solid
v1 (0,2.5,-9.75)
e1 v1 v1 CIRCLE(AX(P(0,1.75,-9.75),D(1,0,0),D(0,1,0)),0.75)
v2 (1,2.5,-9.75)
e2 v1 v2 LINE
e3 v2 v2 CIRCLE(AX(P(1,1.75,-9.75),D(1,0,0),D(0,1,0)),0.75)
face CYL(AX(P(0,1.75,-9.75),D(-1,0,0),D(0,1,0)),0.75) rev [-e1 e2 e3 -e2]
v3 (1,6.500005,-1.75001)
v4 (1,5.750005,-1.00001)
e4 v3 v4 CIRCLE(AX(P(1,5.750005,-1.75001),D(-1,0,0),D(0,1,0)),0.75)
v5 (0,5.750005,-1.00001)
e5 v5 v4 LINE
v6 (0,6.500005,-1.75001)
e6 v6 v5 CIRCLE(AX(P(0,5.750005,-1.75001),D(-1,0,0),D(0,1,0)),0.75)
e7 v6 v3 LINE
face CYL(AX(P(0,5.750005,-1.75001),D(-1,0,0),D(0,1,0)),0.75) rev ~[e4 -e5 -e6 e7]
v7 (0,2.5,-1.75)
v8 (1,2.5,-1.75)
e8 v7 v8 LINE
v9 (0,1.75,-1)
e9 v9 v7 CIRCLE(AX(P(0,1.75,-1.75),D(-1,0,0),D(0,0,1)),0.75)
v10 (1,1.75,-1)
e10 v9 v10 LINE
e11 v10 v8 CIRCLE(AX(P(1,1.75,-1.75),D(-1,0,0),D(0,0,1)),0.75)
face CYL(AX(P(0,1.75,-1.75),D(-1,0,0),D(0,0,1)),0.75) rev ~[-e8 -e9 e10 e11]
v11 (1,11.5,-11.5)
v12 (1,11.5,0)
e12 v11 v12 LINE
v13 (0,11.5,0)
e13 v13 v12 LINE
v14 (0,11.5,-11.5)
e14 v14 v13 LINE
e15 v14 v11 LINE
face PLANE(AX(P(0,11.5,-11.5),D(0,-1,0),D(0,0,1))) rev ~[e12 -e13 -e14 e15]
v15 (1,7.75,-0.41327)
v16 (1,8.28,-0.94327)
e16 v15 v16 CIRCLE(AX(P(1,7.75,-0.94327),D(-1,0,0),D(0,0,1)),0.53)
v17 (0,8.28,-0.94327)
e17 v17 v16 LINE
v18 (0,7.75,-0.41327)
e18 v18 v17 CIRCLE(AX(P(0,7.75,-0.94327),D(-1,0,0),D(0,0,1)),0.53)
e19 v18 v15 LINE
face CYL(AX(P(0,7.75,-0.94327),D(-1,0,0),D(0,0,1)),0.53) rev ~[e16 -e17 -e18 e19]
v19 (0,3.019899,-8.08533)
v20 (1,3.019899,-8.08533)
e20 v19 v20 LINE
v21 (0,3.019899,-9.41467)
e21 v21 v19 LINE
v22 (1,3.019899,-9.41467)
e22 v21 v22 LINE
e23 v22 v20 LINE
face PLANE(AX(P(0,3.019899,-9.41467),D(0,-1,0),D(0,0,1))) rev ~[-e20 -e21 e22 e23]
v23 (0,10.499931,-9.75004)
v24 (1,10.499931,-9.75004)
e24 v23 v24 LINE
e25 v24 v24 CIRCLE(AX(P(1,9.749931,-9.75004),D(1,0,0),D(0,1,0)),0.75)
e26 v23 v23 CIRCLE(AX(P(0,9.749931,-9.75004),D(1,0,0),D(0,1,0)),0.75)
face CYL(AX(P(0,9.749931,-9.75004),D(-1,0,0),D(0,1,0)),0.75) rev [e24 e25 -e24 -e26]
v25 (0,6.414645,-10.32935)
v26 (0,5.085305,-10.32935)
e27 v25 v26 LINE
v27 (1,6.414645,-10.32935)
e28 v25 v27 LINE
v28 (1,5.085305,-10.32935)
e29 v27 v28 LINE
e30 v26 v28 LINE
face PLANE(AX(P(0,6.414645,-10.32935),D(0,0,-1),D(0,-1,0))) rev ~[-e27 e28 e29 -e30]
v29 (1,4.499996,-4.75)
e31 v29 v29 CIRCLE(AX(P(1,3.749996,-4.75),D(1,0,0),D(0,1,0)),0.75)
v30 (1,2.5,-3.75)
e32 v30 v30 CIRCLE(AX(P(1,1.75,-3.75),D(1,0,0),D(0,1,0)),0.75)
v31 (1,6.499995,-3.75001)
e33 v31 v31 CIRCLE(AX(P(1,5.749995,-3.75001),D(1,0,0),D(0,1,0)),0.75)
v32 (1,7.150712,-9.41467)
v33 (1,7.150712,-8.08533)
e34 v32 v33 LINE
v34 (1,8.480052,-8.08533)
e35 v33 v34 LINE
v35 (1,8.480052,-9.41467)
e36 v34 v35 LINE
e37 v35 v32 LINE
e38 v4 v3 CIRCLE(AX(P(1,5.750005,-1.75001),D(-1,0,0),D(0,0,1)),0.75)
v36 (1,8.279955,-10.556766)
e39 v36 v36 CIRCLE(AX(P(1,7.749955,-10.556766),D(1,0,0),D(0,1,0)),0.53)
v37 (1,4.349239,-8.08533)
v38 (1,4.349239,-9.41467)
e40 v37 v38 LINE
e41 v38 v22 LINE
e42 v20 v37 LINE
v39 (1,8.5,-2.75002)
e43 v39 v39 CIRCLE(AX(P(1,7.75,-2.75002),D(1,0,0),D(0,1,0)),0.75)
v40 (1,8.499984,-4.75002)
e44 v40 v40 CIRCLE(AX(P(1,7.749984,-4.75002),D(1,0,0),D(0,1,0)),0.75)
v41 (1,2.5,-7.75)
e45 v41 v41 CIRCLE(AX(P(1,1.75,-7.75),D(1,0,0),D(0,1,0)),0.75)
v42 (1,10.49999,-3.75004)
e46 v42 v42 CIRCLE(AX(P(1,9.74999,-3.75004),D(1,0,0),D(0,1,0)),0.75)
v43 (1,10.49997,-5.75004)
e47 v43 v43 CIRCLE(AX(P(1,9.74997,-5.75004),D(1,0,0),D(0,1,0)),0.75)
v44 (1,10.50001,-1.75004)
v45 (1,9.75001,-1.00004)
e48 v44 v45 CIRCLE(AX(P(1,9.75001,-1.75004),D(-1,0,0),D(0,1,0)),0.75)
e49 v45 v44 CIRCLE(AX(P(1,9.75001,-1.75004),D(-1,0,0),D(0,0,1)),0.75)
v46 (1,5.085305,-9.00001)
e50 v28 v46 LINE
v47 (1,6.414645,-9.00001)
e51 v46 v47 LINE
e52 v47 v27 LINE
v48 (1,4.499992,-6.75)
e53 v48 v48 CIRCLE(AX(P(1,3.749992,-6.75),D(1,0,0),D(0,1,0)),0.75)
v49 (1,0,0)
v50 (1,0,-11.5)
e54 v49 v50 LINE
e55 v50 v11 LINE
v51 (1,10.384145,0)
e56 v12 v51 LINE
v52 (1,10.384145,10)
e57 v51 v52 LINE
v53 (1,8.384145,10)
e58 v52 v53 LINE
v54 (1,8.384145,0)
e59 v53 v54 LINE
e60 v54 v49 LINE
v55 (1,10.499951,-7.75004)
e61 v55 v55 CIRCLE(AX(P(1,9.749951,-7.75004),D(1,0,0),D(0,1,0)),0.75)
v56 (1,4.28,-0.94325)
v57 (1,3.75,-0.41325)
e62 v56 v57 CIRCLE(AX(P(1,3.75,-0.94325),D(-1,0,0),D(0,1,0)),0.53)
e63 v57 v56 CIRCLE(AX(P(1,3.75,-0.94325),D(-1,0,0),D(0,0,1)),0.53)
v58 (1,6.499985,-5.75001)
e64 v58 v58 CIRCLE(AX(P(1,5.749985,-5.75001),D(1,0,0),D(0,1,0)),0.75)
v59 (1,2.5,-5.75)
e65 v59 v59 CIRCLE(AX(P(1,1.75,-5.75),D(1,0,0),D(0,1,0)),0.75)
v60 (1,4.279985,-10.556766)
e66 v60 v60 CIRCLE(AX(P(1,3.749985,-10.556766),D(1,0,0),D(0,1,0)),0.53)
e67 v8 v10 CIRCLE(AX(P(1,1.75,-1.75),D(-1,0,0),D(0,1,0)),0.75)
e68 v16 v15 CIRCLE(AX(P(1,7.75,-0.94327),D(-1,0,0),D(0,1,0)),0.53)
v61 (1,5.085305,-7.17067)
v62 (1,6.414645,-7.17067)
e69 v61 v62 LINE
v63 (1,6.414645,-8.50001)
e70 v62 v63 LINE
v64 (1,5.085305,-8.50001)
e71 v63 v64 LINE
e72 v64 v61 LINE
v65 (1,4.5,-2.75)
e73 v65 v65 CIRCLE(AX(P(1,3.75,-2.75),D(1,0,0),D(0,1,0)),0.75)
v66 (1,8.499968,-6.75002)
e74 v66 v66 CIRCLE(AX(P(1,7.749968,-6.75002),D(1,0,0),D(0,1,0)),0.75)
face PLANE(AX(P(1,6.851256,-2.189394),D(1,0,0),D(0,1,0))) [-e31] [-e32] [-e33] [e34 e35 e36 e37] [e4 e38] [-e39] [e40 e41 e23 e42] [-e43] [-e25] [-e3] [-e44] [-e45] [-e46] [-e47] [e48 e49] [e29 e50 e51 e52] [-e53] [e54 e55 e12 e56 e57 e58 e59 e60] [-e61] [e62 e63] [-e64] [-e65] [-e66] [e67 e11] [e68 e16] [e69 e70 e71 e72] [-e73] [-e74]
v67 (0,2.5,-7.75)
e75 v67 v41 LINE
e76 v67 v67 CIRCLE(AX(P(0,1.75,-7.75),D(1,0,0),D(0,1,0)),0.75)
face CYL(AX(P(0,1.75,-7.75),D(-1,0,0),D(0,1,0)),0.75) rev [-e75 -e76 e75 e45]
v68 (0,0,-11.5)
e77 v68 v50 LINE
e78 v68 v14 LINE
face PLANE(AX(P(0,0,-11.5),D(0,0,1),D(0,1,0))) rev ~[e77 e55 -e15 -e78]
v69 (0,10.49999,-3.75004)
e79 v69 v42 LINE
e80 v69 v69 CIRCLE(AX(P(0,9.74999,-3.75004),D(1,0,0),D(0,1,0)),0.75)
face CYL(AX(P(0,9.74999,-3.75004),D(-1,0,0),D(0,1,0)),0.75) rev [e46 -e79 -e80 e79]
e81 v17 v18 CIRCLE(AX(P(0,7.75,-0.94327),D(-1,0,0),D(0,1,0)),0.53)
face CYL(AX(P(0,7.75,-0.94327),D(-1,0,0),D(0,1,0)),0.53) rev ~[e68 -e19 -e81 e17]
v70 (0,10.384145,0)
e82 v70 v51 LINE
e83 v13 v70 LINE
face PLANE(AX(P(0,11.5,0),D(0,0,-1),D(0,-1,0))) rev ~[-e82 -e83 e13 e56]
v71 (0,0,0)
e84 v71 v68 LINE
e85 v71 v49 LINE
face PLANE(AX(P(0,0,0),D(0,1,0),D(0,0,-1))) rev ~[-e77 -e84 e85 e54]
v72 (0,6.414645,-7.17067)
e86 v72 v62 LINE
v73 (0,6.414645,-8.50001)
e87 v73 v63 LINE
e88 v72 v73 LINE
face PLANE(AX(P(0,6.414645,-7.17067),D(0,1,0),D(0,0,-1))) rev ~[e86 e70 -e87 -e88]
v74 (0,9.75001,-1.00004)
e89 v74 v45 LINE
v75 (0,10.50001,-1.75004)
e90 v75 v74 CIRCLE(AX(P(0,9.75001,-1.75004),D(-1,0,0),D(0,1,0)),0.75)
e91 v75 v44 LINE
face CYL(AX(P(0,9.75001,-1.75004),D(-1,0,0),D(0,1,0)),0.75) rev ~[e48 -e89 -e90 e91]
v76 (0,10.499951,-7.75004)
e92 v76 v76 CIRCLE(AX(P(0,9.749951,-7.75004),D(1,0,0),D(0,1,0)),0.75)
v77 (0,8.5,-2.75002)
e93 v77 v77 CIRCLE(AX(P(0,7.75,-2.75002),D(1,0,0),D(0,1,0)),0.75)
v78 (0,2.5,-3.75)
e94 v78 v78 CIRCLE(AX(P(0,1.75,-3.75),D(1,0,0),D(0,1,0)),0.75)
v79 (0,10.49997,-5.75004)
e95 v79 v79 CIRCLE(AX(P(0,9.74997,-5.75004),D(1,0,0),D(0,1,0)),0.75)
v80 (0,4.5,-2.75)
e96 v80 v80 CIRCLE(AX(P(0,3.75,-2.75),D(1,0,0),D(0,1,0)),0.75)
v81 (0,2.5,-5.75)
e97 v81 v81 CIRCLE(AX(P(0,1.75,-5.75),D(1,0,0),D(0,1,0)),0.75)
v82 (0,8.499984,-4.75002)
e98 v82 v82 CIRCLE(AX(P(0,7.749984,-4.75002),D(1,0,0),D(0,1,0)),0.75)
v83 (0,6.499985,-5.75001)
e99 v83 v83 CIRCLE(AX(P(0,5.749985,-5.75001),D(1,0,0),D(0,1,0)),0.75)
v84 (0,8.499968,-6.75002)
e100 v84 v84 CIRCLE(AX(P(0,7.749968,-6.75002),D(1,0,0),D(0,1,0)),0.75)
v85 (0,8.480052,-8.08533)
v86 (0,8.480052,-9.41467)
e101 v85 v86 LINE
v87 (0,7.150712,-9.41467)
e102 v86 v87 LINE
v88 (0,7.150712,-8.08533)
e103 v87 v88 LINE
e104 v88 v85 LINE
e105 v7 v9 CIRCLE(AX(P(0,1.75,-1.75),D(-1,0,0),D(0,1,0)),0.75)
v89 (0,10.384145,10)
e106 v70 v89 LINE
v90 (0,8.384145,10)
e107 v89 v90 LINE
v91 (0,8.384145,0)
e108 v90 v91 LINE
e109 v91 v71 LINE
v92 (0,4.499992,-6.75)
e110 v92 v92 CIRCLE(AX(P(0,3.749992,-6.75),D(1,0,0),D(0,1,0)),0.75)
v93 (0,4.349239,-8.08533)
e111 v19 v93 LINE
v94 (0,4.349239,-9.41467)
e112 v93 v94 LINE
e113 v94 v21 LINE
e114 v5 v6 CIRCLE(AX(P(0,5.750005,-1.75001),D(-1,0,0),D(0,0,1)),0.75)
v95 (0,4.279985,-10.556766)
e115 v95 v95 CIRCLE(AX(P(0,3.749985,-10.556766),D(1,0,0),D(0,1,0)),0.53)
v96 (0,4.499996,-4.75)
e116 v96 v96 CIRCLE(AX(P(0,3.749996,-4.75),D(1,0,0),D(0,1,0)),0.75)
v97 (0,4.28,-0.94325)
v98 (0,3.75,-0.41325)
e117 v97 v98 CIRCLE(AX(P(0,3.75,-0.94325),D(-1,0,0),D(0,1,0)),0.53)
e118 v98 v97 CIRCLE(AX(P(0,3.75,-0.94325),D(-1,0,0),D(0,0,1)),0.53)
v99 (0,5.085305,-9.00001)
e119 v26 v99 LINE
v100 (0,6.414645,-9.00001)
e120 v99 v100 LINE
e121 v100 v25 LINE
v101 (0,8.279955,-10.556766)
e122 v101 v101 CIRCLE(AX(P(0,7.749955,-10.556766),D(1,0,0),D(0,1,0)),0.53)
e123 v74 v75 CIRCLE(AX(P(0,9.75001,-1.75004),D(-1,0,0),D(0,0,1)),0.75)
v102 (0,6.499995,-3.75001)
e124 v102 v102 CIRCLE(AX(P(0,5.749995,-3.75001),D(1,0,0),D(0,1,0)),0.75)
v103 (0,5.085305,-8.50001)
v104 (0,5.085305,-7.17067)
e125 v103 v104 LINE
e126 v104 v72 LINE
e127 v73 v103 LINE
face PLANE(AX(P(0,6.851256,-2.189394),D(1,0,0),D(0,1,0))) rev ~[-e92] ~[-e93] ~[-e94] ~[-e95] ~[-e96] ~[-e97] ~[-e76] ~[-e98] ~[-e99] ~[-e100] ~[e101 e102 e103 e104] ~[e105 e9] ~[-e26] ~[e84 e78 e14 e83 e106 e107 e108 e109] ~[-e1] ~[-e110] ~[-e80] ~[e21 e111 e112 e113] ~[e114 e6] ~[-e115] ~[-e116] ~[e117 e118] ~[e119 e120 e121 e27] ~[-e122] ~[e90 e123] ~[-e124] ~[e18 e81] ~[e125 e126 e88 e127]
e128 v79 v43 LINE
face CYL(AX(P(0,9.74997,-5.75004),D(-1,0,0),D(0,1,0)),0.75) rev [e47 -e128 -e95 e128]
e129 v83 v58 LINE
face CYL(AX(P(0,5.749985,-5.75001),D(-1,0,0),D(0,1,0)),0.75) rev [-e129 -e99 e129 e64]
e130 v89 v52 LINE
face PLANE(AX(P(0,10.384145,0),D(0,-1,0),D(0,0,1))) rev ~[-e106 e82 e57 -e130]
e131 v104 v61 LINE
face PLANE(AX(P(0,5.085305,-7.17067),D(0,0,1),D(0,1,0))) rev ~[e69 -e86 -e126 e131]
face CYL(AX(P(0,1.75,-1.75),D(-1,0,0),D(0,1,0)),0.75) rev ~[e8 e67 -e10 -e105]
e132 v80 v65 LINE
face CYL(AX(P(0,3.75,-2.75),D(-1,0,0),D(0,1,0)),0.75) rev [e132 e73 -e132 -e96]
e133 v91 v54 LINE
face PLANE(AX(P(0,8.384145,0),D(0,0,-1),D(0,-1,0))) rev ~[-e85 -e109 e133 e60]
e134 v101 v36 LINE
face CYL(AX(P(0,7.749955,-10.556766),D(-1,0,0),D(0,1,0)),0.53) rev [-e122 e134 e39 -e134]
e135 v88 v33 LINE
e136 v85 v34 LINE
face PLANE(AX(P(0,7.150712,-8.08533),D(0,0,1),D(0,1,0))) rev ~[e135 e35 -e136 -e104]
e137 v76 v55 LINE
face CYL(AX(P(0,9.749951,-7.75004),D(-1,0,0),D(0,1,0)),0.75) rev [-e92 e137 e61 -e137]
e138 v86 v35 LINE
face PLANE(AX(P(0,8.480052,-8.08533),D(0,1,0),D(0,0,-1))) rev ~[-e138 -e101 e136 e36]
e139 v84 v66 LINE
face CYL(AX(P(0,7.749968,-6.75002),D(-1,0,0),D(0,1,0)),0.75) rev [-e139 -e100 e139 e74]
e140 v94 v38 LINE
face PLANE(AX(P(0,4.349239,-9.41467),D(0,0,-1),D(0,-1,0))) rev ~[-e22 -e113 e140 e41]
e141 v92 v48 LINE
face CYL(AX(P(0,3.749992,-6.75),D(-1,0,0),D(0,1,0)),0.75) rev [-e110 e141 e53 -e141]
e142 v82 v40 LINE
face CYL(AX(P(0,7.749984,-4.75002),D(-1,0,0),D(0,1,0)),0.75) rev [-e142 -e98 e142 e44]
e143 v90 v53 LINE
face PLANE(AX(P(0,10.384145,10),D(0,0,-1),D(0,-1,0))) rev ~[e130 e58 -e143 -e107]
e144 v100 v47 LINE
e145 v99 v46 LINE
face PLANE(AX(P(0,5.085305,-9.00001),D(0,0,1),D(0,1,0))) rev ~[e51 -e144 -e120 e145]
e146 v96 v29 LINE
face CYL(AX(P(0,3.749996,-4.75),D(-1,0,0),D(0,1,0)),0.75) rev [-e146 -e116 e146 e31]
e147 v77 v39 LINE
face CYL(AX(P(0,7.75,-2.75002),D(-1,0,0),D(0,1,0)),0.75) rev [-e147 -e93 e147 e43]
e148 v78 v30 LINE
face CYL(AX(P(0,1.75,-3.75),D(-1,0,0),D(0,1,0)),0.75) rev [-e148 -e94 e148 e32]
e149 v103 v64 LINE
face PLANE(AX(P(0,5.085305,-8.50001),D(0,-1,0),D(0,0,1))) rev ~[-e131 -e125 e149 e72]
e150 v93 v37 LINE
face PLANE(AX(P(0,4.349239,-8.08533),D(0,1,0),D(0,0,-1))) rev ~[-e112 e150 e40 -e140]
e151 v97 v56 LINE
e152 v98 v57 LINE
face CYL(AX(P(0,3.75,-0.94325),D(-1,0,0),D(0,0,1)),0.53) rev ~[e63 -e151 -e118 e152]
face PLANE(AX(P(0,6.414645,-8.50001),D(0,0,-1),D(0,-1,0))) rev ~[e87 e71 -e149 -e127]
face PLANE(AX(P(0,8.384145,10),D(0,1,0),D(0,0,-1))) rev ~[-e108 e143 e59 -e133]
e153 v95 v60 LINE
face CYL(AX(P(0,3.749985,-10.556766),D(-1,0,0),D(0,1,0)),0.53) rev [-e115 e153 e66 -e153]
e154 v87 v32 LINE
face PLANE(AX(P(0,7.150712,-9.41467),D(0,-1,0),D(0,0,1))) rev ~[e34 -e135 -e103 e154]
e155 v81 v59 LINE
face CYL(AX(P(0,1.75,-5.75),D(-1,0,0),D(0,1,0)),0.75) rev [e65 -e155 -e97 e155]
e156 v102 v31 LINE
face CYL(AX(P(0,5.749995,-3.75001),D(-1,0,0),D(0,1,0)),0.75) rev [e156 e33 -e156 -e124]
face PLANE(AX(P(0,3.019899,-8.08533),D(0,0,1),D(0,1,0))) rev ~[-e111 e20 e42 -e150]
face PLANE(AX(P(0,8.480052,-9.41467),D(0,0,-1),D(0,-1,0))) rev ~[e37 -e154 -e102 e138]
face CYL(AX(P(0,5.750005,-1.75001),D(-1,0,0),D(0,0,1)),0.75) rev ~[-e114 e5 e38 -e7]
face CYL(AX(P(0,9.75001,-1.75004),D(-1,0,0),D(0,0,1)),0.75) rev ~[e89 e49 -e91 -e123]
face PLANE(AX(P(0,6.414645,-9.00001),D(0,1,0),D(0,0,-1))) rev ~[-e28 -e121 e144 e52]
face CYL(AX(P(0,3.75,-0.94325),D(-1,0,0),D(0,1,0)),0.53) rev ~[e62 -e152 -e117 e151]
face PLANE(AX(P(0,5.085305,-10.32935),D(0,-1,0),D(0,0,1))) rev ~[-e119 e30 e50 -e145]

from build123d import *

# Parameters (mm, degrees)
F0_R     = 0.75
F0_R_2   = 0.53
F1_DEPTH = 1


# Not quite as in the source:
# - a feature names something its author has since deleted; it is built from what else it names


with BuildPart() as f1:
    # F0 (on Right) → F1 (new body)
    with BuildSketch(Plane.YZ):
        Polygon((1.75, 0), (0, 0), (0, -11.5), (11.5, -11.5), (11.5, 0), (10.384144865, 0), (10.384144865, 10), (8.384144865, 10), (8.384144865, 0), (7.7499999977, 0), (5.750004947, 0), (3.75, 0), align=None)
        with Locations((1.7500000088, -9.75)):
            Circle(F0_R, mode=Mode.SUBTRACT)
        with Locations((1.75, -7.75)):
            Circle(F0_R, mode=Mode.SUBTRACT)
        with Locations((3.7499851588, -10.5567658602)):
            Circle(F0_R_2, mode=Mode.SUBTRACT)
        Polygon((5.3081902647, -9.0000098941), (5.7499752647, -9.0000098941), (6.1917602647, -9.0000098941), (6.4146452647, -9.0000098941), (6.4146452647, -10.3293498941), (6.1917602647, -10.3293498941), (5.0853052647, -10.3293498941), (5.0853052647, -9.0000098941), align=None, mode=Mode.SUBTRACT)
        Polygon((3.1706485936, -8.0853299912), (4.3492385936, -8.0853299912), (4.3492385936, -8.7499999912), (4.3492385936, -9.4146699912), (3.1706485936, -9.4146699912), (3.0198985936, -9.4146699912), (3.0198985936, -8.7499999912), (3.0198985936, -8.0853299912), align=None, mode=Mode.SUBTRACT)
        with Locations((3.7499923957, -6.75)):
            Circle(F0_R, mode=Mode.SUBTRACT)
        Polygon((6.4146452647, -8.5000098941), (5.7499752647, -8.5000098941), (5.0853052647, -8.5000098941), (5.0853052647, -7.1706698941), (6.1917602647, -7.1706698941), (6.4146452647, -7.1706698941), align=None, mode=Mode.SUBTRACT)
        with Locations((1.75, -5.75)):
            Circle(F0_R, mode=Mode.SUBTRACT)
        with Locations((1.75, -3.75)):
            Circle(F0_R, mode=Mode.SUBTRACT)
        with BuildLine():
            ThreePointArc((2.5, -1.75), (1.2196699141, -2.2803300859), (1.75, -1))
            ThreePointArc((1.75, -1), (2.2803300859, -1.2196699141), (2.5, -1.75))
        make_face(mode=Mode.SUBTRACT)
        with Locations((3.7499961979, -4.75)):
            Circle(F0_R, mode=Mode.SUBTRACT)
        with Locations((5.7499851588, -5.7500098941)):
            Circle(F0_R, mode=Mode.SUBTRACT)
        with Locations((5.7499950529, -3.7500098941)):
            Circle(F0_R, mode=Mode.SUBTRACT)
        with Locations((3.75, -2.75)):
            Circle(F0_R, mode=Mode.SUBTRACT)
        with BuildLine():
            ThreePointArc((4.28, -0.94325), (3.375233406, -1.318016594), (3.75, -0.41325))
            ThreePointArc((3.75, -0.41325), (4.124766594, -0.568483406), (4.28, -0.94325))
        make_face(mode=Mode.SUBTRACT)
        with Locations((7.749955461, -10.5567658602)):
            Circle(F0_R_2, mode=Mode.SUBTRACT)
        Polygon((7.1507119358, -8.7499999912), (7.1507119358, -8.0853299912), (8.3293019358, -8.0853299912), (8.4800519358, -8.0853299912), (8.4800519358, -8.7499999912), (8.4800519358, -9.4146699912), (8.3293019358, -9.4146699912), (7.1507119358, -9.4146699912), align=None, mode=Mode.SUBTRACT)
        with Locations((7.7499680167, -6.7500197925)):
            Circle(F0_R, mode=Mode.SUBTRACT)
        with Locations((9.7499307145, -9.750039585)):
            Circle(F0_R, mode=Mode.SUBTRACT)
        with Locations((9.749950516, -7.7500395851)):
            Circle(F0_R, mode=Mode.SUBTRACT)
        with Locations((7.7499840072, -4.7500197926)):
            Circle(F0_R, mode=Mode.SUBTRACT)
        with BuildLine():
            ThreePointArc((6.500004947, -1.7500098941), (5.2196748611, -2.28033998), (5.750004947, -1.0000098941))
            ThreePointArc((5.750004947, -1.0000098941), (6.2803350329, -1.2196798082), (6.500004947, -1.7500098941))
        make_face(mode=Mode.SUBTRACT)
        with Locations((7.7499999977, -2.7500197927)):
            Circle(F0_R, mode=Mode.SUBTRACT)
        with BuildLine():
            ThreePointArc((8.2799999977, -0.9432697927), (7.3752334037, -1.3180363867), (7.7499999977, -0.4132697927))
            ThreePointArc((7.7499999977, -0.4132697927), (8.1247665918, -0.5685031986), (8.2799999977, -0.9432697927))
        make_face(mode=Mode.SUBTRACT)
        with Locations((9.7499703087, -5.7500395852)):
            Circle(F0_R, mode=Mode.SUBTRACT)
        with Locations((9.7499901013, -3.7500395853)):
            Circle(F0_R, mode=Mode.SUBTRACT)
        with BuildLine():
            ThreePointArc((9.750009894, -1.0000395854), (10.2803399799, -1.2197094995), (10.500009894, -1.7500395854))
            ThreePointArc((10.500009894, -1.7500395854), (9.2196798081, -2.2803696712), (9.750009894, -1.0000395854))
        make_face(mode=Mode.SUBTRACT)
    extrude(amount=F1_DEPTH)


solid = f1.part
